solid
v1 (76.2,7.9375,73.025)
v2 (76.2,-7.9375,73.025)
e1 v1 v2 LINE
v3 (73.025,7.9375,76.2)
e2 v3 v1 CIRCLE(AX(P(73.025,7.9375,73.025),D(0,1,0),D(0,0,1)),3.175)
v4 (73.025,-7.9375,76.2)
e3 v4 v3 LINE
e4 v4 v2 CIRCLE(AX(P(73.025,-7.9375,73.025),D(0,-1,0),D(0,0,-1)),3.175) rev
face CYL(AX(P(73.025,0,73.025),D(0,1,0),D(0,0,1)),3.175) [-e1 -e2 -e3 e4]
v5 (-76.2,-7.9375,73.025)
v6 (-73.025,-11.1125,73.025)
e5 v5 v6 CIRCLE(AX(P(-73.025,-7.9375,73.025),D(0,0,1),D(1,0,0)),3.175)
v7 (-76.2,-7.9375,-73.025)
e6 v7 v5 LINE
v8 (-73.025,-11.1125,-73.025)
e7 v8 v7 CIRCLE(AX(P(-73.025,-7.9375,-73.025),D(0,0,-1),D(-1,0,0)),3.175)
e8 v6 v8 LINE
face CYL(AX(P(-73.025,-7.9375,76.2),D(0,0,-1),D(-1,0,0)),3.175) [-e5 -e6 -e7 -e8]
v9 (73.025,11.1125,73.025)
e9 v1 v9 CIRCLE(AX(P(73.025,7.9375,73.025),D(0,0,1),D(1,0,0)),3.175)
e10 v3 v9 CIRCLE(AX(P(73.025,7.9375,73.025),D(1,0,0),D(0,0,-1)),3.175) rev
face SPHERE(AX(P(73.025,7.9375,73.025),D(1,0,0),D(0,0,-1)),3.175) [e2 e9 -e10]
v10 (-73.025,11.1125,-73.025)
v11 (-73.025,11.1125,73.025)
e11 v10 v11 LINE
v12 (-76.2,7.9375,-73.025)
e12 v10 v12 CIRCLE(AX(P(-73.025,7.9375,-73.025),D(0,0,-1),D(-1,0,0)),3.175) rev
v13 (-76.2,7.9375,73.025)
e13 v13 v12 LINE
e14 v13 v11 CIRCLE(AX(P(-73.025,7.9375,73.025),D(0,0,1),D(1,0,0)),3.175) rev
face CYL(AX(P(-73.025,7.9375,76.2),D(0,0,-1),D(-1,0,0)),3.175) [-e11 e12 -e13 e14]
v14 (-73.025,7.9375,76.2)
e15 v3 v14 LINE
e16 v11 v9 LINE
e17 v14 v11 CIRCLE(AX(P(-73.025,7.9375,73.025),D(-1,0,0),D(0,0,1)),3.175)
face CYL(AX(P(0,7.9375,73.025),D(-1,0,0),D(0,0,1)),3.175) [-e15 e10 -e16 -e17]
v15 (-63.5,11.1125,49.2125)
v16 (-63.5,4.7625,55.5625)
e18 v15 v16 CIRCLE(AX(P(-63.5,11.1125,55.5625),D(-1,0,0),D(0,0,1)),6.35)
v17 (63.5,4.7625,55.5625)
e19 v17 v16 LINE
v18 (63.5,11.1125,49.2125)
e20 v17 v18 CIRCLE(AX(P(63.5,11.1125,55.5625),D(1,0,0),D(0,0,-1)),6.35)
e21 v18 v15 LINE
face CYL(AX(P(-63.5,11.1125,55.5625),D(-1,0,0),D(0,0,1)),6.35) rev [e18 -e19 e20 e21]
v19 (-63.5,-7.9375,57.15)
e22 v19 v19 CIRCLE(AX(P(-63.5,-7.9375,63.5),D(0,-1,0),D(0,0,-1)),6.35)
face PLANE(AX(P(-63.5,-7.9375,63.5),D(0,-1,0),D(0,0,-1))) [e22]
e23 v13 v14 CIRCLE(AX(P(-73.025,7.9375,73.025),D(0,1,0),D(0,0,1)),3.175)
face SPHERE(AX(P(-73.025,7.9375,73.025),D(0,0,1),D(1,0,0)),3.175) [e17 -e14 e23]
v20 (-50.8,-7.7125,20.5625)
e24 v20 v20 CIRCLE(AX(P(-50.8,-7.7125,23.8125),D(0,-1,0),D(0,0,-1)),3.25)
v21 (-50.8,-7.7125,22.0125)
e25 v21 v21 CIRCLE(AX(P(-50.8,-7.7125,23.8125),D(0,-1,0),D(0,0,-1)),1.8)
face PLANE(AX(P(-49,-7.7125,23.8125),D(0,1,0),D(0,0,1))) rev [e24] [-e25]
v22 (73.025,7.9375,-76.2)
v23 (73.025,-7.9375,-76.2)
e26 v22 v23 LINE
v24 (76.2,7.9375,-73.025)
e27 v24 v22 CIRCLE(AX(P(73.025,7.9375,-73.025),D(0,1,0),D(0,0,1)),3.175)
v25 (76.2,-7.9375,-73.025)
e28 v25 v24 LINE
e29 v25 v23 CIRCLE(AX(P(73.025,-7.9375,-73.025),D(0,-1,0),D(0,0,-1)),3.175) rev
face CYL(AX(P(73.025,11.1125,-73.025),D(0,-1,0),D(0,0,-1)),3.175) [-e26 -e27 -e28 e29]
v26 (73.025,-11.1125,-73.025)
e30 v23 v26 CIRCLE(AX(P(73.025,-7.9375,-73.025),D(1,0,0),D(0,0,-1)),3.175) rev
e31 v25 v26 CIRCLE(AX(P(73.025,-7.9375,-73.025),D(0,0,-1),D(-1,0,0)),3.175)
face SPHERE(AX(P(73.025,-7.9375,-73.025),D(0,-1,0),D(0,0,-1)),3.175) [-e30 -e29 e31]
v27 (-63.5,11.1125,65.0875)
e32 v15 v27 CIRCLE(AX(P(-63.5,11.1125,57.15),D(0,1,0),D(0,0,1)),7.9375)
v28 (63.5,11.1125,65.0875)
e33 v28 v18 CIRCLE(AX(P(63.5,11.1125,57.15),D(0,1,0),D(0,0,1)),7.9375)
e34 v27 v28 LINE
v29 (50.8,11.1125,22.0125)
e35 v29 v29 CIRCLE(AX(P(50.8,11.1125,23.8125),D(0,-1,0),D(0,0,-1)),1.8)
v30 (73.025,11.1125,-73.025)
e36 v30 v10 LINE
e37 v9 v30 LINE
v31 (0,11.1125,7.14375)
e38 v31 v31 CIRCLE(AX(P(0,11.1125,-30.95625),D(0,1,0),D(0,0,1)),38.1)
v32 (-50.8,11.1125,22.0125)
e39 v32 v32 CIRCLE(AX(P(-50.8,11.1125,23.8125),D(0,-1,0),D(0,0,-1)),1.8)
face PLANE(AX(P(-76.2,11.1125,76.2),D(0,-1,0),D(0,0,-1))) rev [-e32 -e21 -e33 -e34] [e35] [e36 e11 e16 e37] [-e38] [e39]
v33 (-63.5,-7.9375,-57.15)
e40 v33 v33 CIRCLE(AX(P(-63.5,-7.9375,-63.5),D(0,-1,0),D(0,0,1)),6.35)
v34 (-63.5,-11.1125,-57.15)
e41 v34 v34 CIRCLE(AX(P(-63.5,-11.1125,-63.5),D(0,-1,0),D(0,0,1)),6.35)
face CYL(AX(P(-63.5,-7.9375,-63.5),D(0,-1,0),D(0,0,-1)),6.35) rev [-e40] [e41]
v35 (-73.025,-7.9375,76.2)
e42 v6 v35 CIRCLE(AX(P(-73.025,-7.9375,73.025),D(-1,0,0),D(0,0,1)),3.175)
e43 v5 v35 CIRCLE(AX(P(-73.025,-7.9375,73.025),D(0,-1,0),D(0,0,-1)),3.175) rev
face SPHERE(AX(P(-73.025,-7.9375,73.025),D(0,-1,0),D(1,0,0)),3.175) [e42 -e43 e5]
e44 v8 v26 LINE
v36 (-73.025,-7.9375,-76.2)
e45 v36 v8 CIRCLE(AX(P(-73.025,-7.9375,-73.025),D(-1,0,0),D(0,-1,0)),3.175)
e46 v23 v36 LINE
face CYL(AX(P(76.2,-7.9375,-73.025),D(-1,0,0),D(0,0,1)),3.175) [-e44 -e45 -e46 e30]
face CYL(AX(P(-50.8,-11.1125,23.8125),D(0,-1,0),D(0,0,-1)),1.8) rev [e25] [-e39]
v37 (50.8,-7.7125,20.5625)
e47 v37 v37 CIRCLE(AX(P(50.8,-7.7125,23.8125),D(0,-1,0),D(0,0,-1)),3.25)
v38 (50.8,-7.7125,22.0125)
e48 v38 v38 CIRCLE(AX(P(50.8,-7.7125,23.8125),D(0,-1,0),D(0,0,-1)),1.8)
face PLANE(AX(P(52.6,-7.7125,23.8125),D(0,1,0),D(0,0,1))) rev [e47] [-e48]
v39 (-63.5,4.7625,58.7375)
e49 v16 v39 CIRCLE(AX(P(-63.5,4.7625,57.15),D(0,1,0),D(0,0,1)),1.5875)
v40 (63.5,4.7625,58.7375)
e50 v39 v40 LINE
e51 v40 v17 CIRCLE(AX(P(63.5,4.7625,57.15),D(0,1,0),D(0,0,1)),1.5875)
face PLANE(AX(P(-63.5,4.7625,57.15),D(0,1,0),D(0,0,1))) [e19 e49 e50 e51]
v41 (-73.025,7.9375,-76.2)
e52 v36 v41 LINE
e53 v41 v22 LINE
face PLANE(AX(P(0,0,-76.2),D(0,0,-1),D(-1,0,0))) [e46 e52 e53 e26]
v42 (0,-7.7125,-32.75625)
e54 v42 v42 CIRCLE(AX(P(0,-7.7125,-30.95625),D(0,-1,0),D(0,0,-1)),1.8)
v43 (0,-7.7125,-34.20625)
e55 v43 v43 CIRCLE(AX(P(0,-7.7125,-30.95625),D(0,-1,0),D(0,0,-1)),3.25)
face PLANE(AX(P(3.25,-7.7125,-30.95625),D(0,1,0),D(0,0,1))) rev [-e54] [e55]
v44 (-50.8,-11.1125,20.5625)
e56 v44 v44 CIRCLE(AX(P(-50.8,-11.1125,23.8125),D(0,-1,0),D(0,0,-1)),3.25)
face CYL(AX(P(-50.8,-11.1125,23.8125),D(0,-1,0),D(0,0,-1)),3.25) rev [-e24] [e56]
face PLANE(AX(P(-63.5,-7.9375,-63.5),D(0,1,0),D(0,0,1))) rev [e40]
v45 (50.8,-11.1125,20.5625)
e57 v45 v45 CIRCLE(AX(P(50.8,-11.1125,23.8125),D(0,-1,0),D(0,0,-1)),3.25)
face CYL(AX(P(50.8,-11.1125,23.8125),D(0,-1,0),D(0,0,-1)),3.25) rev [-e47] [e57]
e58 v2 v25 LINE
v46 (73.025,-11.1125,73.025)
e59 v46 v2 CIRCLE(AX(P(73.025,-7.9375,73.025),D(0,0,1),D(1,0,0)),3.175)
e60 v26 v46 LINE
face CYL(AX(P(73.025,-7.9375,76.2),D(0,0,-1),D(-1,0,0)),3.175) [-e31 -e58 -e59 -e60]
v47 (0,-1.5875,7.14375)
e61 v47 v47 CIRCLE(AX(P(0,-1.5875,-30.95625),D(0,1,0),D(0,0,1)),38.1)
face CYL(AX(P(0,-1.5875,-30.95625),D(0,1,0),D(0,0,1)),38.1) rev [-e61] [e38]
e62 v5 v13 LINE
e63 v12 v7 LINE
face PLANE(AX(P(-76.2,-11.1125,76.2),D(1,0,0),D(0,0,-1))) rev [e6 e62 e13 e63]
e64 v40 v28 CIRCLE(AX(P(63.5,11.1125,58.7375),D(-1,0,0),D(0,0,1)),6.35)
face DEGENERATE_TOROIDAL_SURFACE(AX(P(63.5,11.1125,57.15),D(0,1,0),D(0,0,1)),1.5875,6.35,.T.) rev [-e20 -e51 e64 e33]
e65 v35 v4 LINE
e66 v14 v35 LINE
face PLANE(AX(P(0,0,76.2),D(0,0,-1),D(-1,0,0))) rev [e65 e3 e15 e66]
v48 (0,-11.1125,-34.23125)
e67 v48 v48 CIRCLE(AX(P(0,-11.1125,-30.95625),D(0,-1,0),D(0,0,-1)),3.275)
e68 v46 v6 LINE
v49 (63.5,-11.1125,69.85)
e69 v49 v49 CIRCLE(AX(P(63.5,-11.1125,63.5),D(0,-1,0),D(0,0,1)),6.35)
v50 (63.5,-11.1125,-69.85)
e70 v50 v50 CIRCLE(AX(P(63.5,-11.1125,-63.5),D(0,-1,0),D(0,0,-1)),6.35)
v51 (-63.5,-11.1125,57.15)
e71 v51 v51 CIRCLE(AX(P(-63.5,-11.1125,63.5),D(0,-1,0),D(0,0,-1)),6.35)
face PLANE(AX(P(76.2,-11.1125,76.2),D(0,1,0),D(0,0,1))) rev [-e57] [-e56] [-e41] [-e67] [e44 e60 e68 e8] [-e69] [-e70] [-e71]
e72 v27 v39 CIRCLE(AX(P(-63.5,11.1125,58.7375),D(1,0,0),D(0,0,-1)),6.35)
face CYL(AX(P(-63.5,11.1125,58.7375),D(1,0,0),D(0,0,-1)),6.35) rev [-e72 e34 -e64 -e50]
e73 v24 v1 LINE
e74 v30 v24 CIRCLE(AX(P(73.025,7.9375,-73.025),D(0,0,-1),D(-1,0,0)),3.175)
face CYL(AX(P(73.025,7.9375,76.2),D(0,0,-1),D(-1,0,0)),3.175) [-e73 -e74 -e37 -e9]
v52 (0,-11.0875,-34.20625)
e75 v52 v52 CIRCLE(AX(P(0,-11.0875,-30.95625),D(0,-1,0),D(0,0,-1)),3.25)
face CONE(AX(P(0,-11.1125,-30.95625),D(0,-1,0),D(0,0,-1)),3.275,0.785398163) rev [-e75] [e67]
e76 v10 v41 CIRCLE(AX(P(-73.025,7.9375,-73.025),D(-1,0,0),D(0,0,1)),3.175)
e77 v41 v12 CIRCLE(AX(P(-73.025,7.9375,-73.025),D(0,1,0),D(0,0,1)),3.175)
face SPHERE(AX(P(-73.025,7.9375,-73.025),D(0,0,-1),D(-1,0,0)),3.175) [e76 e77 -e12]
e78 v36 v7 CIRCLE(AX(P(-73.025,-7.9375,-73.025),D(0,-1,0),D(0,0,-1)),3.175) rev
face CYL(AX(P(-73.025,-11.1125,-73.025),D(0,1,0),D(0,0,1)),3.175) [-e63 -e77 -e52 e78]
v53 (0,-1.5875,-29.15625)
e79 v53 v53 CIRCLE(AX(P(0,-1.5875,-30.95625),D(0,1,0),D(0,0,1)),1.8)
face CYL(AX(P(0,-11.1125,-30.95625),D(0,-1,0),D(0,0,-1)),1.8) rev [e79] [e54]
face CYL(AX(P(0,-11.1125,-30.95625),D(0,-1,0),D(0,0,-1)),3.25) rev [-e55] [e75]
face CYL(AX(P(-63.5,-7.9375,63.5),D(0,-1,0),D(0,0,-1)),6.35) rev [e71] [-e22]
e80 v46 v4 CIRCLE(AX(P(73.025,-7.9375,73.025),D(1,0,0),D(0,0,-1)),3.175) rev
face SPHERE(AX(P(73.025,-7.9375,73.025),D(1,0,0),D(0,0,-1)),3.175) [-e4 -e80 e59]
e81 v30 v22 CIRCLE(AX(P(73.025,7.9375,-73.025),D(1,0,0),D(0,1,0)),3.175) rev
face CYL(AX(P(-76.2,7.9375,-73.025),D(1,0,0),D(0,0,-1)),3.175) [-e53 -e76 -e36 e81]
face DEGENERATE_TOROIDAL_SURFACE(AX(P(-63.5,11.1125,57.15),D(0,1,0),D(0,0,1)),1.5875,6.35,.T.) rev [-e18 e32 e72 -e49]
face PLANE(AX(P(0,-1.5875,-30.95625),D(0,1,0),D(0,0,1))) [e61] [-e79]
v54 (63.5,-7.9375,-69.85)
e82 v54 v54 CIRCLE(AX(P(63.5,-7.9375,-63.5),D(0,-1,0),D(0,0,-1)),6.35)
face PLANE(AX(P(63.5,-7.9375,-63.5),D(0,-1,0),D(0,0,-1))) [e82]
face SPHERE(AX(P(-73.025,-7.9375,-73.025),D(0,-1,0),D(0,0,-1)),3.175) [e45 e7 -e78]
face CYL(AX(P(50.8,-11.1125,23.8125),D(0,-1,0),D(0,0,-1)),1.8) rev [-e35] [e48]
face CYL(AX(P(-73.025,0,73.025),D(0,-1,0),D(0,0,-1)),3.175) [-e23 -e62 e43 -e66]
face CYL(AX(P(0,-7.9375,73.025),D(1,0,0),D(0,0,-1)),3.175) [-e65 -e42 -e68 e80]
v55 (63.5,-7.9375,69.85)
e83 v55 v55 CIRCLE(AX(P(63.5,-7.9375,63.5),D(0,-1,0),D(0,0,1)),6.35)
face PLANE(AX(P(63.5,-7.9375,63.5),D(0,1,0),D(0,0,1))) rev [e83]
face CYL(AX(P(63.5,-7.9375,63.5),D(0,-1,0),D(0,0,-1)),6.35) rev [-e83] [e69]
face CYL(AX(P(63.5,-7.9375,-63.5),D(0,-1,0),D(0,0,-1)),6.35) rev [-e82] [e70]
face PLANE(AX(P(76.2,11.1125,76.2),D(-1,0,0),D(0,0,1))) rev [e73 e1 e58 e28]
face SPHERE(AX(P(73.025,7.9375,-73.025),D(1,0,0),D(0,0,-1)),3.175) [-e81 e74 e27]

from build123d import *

# Parameters (mm, degrees)
SKETCH3_W                                           = 152.4
SKETCH3_H                                           = 22.225
BOSS_EXTRUDE1_DEPTH                                 = 76.2
FEET_R                                              = 6.35
RUBBER_FEET_DEPTH                                   = 3.175
CUT_EXTRUDE2_DEPTH                                  = 6.35
FILLET2_R                                           = 6.35
FILLET1_R                                           = 3.175
CBORE_FOR_M3_HEX_SOCKET_HEAD_CAP_SCREW1_D           = 3.6
CBORE_FOR_M3_HEX_SOCKET_HEAD_CAP_SCREW1_CBORE_D     = 6.5
CBORE_FOR_M3_HEX_SOCKET_HEAD_CAP_SCREW1_CBORE_DEPTH = 3.4
SKETCH10_R                                          = 38.1
CUT_EXTRUDE3_DEPTH                                  = 12.7


with BuildPart() as part:
    # Sketch3 → Boss-Extrude1 (new, symmetric)
    with BuildSketch(Plane.XY):
        Rectangle(SKETCH3_W, SKETCH3_H)
    extrude(amount=BOSS_EXTRUDE1_DEPTH, both=True)

    # Feet → Rubber Feet (cut)
    with BuildSketch(Plane.XZ.offset(11.1125)):
        with Locations(Location((-63.5, 63.5, 0), (0, 0, 270))):
            Circle(FEET_R)
        with Locations(Location((63.5, 63.5, 0), (0, 0, 90))):
            Circle(FEET_R)
        with Locations(Location((63.5, -63.5, 0), (0, 0, 270))):
            Circle(FEET_R)
        with Locations(Location((-63.5, -63.5, 0), (0, 0, 90))):
            Circle(FEET_R)
    extrude(amount=-RUBBER_FEET_DEPTH, mode=Mode.SUBTRACT)

    # Sketch6 → Cut-Extrude2 (cut)
    with BuildSketch(Plane(origin=(0, 11.1125, 0), x_dir=(1, 0, 0), z_dir=(0, 1, 0))):
        with BuildLine():
            Line((-63.5, -49.2125), (63.5, -49.2125))
            ThreePointArc((63.5, -49.2125), (71.4375, -57.15), (63.5, -65.0875))
            Line((63.5, -65.0875), (-63.5, -65.0875))
            ThreePointArc((-63.5, -65.0875), (-71.4375, -57.15), (-63.5, -49.2125))
        make_face()
    extrude(amount=-CUT_EXTRUDE2_DEPTH, mode=Mode.SUBTRACT)

    # Fillet2
    fillet2_edges = [part.edges().sort_by_distance(p)[0] for p in [
        (0, 4.7625, 49.2125),
        (71.4375, 4.7625, 57.15),
        (0, 4.7625, 65.0875),
        (-71.4375, 4.7625, 57.15),
    ]]
    fillet(fillet2_edges, radius=FILLET2_R - 0.0001)  # a hair under: the kernel refuses the full size

    # Fillet1
    fillet1_edges = [part.edges().sort_by_distance(p)[0] for p in [
        (76.2, 0, 76.2),
        (0, 11.1125, 76.2),
        (-76.2, 0, 76.2),
        (0, 11.1125, -76.2),
        (76.2, 0, -76.2),
        (0, -11.1125, -76.2),
        (-76.2, 0, -76.2),
        (0, -11.1125, 76.2),
        (-76.2, 11.1125, 0),
        (76.2, 11.1125, 0),
        (76.2, -11.1125, 0),
        (-76.2, -11.1125, 0),
    ]]
    fillet(fillet1_edges, radius=FILLET1_R)

    # CBORE for M3 Hex Socket Head Cap Screw1 (through all)
    with Locations(Plane(origin=(0, -11.1125, 0), x_dir=(-1, 0, 0), z_dir=(0, -1, 0))):
        with Locations((-50.8, -23.8125), (50.8, -23.8125)):
            CounterBoreHole(CBORE_FOR_M3_HEX_SOCKET_HEAD_CAP_SCREW1_D / 2, CBORE_FOR_M3_HEX_SOCKET_HEAD_CAP_SCREW1_CBORE_D / 2, CBORE_FOR_M3_HEX_SOCKET_HEAD_CAP_SCREW1_CBORE_DEPTH)

    # Sketch10 → Cut-Extrude3 (cut)
    with BuildSketch(Plane(origin=(0, 11.1125, 0), x_dir=(1, 0, 0), z_dir=(0, 1, 0))):
        with Locations(Location((0, 30.95625, 0), (0, 0, 270))):
            Circle(SKETCH10_R)
    extrude(amount=-CUT_EXTRUDE3_DEPTH, mode=Mode.SUBTRACT)

    # Sketch13 → CBORE for M3 Hex Socket Head Cap Screw2 (revolve, cut)
    with BuildSketch(Plane(origin=(0, -11.1125, -30.95625), x_dir=(0, 0, -1), z_dir=(1, 0, 0))):
        Polygon((0, 0), (0, 22.225), (1.8, 22.225), (1.8, 3.4), (3.25, 3.4), (3.25, 0.025), (3.275, 0), align=None)
    revolve(axis=Axis((0, -17.4625, -30.95625), (0, 1, 0)), mode=Mode.SUBTRACT)


solid = part.part
